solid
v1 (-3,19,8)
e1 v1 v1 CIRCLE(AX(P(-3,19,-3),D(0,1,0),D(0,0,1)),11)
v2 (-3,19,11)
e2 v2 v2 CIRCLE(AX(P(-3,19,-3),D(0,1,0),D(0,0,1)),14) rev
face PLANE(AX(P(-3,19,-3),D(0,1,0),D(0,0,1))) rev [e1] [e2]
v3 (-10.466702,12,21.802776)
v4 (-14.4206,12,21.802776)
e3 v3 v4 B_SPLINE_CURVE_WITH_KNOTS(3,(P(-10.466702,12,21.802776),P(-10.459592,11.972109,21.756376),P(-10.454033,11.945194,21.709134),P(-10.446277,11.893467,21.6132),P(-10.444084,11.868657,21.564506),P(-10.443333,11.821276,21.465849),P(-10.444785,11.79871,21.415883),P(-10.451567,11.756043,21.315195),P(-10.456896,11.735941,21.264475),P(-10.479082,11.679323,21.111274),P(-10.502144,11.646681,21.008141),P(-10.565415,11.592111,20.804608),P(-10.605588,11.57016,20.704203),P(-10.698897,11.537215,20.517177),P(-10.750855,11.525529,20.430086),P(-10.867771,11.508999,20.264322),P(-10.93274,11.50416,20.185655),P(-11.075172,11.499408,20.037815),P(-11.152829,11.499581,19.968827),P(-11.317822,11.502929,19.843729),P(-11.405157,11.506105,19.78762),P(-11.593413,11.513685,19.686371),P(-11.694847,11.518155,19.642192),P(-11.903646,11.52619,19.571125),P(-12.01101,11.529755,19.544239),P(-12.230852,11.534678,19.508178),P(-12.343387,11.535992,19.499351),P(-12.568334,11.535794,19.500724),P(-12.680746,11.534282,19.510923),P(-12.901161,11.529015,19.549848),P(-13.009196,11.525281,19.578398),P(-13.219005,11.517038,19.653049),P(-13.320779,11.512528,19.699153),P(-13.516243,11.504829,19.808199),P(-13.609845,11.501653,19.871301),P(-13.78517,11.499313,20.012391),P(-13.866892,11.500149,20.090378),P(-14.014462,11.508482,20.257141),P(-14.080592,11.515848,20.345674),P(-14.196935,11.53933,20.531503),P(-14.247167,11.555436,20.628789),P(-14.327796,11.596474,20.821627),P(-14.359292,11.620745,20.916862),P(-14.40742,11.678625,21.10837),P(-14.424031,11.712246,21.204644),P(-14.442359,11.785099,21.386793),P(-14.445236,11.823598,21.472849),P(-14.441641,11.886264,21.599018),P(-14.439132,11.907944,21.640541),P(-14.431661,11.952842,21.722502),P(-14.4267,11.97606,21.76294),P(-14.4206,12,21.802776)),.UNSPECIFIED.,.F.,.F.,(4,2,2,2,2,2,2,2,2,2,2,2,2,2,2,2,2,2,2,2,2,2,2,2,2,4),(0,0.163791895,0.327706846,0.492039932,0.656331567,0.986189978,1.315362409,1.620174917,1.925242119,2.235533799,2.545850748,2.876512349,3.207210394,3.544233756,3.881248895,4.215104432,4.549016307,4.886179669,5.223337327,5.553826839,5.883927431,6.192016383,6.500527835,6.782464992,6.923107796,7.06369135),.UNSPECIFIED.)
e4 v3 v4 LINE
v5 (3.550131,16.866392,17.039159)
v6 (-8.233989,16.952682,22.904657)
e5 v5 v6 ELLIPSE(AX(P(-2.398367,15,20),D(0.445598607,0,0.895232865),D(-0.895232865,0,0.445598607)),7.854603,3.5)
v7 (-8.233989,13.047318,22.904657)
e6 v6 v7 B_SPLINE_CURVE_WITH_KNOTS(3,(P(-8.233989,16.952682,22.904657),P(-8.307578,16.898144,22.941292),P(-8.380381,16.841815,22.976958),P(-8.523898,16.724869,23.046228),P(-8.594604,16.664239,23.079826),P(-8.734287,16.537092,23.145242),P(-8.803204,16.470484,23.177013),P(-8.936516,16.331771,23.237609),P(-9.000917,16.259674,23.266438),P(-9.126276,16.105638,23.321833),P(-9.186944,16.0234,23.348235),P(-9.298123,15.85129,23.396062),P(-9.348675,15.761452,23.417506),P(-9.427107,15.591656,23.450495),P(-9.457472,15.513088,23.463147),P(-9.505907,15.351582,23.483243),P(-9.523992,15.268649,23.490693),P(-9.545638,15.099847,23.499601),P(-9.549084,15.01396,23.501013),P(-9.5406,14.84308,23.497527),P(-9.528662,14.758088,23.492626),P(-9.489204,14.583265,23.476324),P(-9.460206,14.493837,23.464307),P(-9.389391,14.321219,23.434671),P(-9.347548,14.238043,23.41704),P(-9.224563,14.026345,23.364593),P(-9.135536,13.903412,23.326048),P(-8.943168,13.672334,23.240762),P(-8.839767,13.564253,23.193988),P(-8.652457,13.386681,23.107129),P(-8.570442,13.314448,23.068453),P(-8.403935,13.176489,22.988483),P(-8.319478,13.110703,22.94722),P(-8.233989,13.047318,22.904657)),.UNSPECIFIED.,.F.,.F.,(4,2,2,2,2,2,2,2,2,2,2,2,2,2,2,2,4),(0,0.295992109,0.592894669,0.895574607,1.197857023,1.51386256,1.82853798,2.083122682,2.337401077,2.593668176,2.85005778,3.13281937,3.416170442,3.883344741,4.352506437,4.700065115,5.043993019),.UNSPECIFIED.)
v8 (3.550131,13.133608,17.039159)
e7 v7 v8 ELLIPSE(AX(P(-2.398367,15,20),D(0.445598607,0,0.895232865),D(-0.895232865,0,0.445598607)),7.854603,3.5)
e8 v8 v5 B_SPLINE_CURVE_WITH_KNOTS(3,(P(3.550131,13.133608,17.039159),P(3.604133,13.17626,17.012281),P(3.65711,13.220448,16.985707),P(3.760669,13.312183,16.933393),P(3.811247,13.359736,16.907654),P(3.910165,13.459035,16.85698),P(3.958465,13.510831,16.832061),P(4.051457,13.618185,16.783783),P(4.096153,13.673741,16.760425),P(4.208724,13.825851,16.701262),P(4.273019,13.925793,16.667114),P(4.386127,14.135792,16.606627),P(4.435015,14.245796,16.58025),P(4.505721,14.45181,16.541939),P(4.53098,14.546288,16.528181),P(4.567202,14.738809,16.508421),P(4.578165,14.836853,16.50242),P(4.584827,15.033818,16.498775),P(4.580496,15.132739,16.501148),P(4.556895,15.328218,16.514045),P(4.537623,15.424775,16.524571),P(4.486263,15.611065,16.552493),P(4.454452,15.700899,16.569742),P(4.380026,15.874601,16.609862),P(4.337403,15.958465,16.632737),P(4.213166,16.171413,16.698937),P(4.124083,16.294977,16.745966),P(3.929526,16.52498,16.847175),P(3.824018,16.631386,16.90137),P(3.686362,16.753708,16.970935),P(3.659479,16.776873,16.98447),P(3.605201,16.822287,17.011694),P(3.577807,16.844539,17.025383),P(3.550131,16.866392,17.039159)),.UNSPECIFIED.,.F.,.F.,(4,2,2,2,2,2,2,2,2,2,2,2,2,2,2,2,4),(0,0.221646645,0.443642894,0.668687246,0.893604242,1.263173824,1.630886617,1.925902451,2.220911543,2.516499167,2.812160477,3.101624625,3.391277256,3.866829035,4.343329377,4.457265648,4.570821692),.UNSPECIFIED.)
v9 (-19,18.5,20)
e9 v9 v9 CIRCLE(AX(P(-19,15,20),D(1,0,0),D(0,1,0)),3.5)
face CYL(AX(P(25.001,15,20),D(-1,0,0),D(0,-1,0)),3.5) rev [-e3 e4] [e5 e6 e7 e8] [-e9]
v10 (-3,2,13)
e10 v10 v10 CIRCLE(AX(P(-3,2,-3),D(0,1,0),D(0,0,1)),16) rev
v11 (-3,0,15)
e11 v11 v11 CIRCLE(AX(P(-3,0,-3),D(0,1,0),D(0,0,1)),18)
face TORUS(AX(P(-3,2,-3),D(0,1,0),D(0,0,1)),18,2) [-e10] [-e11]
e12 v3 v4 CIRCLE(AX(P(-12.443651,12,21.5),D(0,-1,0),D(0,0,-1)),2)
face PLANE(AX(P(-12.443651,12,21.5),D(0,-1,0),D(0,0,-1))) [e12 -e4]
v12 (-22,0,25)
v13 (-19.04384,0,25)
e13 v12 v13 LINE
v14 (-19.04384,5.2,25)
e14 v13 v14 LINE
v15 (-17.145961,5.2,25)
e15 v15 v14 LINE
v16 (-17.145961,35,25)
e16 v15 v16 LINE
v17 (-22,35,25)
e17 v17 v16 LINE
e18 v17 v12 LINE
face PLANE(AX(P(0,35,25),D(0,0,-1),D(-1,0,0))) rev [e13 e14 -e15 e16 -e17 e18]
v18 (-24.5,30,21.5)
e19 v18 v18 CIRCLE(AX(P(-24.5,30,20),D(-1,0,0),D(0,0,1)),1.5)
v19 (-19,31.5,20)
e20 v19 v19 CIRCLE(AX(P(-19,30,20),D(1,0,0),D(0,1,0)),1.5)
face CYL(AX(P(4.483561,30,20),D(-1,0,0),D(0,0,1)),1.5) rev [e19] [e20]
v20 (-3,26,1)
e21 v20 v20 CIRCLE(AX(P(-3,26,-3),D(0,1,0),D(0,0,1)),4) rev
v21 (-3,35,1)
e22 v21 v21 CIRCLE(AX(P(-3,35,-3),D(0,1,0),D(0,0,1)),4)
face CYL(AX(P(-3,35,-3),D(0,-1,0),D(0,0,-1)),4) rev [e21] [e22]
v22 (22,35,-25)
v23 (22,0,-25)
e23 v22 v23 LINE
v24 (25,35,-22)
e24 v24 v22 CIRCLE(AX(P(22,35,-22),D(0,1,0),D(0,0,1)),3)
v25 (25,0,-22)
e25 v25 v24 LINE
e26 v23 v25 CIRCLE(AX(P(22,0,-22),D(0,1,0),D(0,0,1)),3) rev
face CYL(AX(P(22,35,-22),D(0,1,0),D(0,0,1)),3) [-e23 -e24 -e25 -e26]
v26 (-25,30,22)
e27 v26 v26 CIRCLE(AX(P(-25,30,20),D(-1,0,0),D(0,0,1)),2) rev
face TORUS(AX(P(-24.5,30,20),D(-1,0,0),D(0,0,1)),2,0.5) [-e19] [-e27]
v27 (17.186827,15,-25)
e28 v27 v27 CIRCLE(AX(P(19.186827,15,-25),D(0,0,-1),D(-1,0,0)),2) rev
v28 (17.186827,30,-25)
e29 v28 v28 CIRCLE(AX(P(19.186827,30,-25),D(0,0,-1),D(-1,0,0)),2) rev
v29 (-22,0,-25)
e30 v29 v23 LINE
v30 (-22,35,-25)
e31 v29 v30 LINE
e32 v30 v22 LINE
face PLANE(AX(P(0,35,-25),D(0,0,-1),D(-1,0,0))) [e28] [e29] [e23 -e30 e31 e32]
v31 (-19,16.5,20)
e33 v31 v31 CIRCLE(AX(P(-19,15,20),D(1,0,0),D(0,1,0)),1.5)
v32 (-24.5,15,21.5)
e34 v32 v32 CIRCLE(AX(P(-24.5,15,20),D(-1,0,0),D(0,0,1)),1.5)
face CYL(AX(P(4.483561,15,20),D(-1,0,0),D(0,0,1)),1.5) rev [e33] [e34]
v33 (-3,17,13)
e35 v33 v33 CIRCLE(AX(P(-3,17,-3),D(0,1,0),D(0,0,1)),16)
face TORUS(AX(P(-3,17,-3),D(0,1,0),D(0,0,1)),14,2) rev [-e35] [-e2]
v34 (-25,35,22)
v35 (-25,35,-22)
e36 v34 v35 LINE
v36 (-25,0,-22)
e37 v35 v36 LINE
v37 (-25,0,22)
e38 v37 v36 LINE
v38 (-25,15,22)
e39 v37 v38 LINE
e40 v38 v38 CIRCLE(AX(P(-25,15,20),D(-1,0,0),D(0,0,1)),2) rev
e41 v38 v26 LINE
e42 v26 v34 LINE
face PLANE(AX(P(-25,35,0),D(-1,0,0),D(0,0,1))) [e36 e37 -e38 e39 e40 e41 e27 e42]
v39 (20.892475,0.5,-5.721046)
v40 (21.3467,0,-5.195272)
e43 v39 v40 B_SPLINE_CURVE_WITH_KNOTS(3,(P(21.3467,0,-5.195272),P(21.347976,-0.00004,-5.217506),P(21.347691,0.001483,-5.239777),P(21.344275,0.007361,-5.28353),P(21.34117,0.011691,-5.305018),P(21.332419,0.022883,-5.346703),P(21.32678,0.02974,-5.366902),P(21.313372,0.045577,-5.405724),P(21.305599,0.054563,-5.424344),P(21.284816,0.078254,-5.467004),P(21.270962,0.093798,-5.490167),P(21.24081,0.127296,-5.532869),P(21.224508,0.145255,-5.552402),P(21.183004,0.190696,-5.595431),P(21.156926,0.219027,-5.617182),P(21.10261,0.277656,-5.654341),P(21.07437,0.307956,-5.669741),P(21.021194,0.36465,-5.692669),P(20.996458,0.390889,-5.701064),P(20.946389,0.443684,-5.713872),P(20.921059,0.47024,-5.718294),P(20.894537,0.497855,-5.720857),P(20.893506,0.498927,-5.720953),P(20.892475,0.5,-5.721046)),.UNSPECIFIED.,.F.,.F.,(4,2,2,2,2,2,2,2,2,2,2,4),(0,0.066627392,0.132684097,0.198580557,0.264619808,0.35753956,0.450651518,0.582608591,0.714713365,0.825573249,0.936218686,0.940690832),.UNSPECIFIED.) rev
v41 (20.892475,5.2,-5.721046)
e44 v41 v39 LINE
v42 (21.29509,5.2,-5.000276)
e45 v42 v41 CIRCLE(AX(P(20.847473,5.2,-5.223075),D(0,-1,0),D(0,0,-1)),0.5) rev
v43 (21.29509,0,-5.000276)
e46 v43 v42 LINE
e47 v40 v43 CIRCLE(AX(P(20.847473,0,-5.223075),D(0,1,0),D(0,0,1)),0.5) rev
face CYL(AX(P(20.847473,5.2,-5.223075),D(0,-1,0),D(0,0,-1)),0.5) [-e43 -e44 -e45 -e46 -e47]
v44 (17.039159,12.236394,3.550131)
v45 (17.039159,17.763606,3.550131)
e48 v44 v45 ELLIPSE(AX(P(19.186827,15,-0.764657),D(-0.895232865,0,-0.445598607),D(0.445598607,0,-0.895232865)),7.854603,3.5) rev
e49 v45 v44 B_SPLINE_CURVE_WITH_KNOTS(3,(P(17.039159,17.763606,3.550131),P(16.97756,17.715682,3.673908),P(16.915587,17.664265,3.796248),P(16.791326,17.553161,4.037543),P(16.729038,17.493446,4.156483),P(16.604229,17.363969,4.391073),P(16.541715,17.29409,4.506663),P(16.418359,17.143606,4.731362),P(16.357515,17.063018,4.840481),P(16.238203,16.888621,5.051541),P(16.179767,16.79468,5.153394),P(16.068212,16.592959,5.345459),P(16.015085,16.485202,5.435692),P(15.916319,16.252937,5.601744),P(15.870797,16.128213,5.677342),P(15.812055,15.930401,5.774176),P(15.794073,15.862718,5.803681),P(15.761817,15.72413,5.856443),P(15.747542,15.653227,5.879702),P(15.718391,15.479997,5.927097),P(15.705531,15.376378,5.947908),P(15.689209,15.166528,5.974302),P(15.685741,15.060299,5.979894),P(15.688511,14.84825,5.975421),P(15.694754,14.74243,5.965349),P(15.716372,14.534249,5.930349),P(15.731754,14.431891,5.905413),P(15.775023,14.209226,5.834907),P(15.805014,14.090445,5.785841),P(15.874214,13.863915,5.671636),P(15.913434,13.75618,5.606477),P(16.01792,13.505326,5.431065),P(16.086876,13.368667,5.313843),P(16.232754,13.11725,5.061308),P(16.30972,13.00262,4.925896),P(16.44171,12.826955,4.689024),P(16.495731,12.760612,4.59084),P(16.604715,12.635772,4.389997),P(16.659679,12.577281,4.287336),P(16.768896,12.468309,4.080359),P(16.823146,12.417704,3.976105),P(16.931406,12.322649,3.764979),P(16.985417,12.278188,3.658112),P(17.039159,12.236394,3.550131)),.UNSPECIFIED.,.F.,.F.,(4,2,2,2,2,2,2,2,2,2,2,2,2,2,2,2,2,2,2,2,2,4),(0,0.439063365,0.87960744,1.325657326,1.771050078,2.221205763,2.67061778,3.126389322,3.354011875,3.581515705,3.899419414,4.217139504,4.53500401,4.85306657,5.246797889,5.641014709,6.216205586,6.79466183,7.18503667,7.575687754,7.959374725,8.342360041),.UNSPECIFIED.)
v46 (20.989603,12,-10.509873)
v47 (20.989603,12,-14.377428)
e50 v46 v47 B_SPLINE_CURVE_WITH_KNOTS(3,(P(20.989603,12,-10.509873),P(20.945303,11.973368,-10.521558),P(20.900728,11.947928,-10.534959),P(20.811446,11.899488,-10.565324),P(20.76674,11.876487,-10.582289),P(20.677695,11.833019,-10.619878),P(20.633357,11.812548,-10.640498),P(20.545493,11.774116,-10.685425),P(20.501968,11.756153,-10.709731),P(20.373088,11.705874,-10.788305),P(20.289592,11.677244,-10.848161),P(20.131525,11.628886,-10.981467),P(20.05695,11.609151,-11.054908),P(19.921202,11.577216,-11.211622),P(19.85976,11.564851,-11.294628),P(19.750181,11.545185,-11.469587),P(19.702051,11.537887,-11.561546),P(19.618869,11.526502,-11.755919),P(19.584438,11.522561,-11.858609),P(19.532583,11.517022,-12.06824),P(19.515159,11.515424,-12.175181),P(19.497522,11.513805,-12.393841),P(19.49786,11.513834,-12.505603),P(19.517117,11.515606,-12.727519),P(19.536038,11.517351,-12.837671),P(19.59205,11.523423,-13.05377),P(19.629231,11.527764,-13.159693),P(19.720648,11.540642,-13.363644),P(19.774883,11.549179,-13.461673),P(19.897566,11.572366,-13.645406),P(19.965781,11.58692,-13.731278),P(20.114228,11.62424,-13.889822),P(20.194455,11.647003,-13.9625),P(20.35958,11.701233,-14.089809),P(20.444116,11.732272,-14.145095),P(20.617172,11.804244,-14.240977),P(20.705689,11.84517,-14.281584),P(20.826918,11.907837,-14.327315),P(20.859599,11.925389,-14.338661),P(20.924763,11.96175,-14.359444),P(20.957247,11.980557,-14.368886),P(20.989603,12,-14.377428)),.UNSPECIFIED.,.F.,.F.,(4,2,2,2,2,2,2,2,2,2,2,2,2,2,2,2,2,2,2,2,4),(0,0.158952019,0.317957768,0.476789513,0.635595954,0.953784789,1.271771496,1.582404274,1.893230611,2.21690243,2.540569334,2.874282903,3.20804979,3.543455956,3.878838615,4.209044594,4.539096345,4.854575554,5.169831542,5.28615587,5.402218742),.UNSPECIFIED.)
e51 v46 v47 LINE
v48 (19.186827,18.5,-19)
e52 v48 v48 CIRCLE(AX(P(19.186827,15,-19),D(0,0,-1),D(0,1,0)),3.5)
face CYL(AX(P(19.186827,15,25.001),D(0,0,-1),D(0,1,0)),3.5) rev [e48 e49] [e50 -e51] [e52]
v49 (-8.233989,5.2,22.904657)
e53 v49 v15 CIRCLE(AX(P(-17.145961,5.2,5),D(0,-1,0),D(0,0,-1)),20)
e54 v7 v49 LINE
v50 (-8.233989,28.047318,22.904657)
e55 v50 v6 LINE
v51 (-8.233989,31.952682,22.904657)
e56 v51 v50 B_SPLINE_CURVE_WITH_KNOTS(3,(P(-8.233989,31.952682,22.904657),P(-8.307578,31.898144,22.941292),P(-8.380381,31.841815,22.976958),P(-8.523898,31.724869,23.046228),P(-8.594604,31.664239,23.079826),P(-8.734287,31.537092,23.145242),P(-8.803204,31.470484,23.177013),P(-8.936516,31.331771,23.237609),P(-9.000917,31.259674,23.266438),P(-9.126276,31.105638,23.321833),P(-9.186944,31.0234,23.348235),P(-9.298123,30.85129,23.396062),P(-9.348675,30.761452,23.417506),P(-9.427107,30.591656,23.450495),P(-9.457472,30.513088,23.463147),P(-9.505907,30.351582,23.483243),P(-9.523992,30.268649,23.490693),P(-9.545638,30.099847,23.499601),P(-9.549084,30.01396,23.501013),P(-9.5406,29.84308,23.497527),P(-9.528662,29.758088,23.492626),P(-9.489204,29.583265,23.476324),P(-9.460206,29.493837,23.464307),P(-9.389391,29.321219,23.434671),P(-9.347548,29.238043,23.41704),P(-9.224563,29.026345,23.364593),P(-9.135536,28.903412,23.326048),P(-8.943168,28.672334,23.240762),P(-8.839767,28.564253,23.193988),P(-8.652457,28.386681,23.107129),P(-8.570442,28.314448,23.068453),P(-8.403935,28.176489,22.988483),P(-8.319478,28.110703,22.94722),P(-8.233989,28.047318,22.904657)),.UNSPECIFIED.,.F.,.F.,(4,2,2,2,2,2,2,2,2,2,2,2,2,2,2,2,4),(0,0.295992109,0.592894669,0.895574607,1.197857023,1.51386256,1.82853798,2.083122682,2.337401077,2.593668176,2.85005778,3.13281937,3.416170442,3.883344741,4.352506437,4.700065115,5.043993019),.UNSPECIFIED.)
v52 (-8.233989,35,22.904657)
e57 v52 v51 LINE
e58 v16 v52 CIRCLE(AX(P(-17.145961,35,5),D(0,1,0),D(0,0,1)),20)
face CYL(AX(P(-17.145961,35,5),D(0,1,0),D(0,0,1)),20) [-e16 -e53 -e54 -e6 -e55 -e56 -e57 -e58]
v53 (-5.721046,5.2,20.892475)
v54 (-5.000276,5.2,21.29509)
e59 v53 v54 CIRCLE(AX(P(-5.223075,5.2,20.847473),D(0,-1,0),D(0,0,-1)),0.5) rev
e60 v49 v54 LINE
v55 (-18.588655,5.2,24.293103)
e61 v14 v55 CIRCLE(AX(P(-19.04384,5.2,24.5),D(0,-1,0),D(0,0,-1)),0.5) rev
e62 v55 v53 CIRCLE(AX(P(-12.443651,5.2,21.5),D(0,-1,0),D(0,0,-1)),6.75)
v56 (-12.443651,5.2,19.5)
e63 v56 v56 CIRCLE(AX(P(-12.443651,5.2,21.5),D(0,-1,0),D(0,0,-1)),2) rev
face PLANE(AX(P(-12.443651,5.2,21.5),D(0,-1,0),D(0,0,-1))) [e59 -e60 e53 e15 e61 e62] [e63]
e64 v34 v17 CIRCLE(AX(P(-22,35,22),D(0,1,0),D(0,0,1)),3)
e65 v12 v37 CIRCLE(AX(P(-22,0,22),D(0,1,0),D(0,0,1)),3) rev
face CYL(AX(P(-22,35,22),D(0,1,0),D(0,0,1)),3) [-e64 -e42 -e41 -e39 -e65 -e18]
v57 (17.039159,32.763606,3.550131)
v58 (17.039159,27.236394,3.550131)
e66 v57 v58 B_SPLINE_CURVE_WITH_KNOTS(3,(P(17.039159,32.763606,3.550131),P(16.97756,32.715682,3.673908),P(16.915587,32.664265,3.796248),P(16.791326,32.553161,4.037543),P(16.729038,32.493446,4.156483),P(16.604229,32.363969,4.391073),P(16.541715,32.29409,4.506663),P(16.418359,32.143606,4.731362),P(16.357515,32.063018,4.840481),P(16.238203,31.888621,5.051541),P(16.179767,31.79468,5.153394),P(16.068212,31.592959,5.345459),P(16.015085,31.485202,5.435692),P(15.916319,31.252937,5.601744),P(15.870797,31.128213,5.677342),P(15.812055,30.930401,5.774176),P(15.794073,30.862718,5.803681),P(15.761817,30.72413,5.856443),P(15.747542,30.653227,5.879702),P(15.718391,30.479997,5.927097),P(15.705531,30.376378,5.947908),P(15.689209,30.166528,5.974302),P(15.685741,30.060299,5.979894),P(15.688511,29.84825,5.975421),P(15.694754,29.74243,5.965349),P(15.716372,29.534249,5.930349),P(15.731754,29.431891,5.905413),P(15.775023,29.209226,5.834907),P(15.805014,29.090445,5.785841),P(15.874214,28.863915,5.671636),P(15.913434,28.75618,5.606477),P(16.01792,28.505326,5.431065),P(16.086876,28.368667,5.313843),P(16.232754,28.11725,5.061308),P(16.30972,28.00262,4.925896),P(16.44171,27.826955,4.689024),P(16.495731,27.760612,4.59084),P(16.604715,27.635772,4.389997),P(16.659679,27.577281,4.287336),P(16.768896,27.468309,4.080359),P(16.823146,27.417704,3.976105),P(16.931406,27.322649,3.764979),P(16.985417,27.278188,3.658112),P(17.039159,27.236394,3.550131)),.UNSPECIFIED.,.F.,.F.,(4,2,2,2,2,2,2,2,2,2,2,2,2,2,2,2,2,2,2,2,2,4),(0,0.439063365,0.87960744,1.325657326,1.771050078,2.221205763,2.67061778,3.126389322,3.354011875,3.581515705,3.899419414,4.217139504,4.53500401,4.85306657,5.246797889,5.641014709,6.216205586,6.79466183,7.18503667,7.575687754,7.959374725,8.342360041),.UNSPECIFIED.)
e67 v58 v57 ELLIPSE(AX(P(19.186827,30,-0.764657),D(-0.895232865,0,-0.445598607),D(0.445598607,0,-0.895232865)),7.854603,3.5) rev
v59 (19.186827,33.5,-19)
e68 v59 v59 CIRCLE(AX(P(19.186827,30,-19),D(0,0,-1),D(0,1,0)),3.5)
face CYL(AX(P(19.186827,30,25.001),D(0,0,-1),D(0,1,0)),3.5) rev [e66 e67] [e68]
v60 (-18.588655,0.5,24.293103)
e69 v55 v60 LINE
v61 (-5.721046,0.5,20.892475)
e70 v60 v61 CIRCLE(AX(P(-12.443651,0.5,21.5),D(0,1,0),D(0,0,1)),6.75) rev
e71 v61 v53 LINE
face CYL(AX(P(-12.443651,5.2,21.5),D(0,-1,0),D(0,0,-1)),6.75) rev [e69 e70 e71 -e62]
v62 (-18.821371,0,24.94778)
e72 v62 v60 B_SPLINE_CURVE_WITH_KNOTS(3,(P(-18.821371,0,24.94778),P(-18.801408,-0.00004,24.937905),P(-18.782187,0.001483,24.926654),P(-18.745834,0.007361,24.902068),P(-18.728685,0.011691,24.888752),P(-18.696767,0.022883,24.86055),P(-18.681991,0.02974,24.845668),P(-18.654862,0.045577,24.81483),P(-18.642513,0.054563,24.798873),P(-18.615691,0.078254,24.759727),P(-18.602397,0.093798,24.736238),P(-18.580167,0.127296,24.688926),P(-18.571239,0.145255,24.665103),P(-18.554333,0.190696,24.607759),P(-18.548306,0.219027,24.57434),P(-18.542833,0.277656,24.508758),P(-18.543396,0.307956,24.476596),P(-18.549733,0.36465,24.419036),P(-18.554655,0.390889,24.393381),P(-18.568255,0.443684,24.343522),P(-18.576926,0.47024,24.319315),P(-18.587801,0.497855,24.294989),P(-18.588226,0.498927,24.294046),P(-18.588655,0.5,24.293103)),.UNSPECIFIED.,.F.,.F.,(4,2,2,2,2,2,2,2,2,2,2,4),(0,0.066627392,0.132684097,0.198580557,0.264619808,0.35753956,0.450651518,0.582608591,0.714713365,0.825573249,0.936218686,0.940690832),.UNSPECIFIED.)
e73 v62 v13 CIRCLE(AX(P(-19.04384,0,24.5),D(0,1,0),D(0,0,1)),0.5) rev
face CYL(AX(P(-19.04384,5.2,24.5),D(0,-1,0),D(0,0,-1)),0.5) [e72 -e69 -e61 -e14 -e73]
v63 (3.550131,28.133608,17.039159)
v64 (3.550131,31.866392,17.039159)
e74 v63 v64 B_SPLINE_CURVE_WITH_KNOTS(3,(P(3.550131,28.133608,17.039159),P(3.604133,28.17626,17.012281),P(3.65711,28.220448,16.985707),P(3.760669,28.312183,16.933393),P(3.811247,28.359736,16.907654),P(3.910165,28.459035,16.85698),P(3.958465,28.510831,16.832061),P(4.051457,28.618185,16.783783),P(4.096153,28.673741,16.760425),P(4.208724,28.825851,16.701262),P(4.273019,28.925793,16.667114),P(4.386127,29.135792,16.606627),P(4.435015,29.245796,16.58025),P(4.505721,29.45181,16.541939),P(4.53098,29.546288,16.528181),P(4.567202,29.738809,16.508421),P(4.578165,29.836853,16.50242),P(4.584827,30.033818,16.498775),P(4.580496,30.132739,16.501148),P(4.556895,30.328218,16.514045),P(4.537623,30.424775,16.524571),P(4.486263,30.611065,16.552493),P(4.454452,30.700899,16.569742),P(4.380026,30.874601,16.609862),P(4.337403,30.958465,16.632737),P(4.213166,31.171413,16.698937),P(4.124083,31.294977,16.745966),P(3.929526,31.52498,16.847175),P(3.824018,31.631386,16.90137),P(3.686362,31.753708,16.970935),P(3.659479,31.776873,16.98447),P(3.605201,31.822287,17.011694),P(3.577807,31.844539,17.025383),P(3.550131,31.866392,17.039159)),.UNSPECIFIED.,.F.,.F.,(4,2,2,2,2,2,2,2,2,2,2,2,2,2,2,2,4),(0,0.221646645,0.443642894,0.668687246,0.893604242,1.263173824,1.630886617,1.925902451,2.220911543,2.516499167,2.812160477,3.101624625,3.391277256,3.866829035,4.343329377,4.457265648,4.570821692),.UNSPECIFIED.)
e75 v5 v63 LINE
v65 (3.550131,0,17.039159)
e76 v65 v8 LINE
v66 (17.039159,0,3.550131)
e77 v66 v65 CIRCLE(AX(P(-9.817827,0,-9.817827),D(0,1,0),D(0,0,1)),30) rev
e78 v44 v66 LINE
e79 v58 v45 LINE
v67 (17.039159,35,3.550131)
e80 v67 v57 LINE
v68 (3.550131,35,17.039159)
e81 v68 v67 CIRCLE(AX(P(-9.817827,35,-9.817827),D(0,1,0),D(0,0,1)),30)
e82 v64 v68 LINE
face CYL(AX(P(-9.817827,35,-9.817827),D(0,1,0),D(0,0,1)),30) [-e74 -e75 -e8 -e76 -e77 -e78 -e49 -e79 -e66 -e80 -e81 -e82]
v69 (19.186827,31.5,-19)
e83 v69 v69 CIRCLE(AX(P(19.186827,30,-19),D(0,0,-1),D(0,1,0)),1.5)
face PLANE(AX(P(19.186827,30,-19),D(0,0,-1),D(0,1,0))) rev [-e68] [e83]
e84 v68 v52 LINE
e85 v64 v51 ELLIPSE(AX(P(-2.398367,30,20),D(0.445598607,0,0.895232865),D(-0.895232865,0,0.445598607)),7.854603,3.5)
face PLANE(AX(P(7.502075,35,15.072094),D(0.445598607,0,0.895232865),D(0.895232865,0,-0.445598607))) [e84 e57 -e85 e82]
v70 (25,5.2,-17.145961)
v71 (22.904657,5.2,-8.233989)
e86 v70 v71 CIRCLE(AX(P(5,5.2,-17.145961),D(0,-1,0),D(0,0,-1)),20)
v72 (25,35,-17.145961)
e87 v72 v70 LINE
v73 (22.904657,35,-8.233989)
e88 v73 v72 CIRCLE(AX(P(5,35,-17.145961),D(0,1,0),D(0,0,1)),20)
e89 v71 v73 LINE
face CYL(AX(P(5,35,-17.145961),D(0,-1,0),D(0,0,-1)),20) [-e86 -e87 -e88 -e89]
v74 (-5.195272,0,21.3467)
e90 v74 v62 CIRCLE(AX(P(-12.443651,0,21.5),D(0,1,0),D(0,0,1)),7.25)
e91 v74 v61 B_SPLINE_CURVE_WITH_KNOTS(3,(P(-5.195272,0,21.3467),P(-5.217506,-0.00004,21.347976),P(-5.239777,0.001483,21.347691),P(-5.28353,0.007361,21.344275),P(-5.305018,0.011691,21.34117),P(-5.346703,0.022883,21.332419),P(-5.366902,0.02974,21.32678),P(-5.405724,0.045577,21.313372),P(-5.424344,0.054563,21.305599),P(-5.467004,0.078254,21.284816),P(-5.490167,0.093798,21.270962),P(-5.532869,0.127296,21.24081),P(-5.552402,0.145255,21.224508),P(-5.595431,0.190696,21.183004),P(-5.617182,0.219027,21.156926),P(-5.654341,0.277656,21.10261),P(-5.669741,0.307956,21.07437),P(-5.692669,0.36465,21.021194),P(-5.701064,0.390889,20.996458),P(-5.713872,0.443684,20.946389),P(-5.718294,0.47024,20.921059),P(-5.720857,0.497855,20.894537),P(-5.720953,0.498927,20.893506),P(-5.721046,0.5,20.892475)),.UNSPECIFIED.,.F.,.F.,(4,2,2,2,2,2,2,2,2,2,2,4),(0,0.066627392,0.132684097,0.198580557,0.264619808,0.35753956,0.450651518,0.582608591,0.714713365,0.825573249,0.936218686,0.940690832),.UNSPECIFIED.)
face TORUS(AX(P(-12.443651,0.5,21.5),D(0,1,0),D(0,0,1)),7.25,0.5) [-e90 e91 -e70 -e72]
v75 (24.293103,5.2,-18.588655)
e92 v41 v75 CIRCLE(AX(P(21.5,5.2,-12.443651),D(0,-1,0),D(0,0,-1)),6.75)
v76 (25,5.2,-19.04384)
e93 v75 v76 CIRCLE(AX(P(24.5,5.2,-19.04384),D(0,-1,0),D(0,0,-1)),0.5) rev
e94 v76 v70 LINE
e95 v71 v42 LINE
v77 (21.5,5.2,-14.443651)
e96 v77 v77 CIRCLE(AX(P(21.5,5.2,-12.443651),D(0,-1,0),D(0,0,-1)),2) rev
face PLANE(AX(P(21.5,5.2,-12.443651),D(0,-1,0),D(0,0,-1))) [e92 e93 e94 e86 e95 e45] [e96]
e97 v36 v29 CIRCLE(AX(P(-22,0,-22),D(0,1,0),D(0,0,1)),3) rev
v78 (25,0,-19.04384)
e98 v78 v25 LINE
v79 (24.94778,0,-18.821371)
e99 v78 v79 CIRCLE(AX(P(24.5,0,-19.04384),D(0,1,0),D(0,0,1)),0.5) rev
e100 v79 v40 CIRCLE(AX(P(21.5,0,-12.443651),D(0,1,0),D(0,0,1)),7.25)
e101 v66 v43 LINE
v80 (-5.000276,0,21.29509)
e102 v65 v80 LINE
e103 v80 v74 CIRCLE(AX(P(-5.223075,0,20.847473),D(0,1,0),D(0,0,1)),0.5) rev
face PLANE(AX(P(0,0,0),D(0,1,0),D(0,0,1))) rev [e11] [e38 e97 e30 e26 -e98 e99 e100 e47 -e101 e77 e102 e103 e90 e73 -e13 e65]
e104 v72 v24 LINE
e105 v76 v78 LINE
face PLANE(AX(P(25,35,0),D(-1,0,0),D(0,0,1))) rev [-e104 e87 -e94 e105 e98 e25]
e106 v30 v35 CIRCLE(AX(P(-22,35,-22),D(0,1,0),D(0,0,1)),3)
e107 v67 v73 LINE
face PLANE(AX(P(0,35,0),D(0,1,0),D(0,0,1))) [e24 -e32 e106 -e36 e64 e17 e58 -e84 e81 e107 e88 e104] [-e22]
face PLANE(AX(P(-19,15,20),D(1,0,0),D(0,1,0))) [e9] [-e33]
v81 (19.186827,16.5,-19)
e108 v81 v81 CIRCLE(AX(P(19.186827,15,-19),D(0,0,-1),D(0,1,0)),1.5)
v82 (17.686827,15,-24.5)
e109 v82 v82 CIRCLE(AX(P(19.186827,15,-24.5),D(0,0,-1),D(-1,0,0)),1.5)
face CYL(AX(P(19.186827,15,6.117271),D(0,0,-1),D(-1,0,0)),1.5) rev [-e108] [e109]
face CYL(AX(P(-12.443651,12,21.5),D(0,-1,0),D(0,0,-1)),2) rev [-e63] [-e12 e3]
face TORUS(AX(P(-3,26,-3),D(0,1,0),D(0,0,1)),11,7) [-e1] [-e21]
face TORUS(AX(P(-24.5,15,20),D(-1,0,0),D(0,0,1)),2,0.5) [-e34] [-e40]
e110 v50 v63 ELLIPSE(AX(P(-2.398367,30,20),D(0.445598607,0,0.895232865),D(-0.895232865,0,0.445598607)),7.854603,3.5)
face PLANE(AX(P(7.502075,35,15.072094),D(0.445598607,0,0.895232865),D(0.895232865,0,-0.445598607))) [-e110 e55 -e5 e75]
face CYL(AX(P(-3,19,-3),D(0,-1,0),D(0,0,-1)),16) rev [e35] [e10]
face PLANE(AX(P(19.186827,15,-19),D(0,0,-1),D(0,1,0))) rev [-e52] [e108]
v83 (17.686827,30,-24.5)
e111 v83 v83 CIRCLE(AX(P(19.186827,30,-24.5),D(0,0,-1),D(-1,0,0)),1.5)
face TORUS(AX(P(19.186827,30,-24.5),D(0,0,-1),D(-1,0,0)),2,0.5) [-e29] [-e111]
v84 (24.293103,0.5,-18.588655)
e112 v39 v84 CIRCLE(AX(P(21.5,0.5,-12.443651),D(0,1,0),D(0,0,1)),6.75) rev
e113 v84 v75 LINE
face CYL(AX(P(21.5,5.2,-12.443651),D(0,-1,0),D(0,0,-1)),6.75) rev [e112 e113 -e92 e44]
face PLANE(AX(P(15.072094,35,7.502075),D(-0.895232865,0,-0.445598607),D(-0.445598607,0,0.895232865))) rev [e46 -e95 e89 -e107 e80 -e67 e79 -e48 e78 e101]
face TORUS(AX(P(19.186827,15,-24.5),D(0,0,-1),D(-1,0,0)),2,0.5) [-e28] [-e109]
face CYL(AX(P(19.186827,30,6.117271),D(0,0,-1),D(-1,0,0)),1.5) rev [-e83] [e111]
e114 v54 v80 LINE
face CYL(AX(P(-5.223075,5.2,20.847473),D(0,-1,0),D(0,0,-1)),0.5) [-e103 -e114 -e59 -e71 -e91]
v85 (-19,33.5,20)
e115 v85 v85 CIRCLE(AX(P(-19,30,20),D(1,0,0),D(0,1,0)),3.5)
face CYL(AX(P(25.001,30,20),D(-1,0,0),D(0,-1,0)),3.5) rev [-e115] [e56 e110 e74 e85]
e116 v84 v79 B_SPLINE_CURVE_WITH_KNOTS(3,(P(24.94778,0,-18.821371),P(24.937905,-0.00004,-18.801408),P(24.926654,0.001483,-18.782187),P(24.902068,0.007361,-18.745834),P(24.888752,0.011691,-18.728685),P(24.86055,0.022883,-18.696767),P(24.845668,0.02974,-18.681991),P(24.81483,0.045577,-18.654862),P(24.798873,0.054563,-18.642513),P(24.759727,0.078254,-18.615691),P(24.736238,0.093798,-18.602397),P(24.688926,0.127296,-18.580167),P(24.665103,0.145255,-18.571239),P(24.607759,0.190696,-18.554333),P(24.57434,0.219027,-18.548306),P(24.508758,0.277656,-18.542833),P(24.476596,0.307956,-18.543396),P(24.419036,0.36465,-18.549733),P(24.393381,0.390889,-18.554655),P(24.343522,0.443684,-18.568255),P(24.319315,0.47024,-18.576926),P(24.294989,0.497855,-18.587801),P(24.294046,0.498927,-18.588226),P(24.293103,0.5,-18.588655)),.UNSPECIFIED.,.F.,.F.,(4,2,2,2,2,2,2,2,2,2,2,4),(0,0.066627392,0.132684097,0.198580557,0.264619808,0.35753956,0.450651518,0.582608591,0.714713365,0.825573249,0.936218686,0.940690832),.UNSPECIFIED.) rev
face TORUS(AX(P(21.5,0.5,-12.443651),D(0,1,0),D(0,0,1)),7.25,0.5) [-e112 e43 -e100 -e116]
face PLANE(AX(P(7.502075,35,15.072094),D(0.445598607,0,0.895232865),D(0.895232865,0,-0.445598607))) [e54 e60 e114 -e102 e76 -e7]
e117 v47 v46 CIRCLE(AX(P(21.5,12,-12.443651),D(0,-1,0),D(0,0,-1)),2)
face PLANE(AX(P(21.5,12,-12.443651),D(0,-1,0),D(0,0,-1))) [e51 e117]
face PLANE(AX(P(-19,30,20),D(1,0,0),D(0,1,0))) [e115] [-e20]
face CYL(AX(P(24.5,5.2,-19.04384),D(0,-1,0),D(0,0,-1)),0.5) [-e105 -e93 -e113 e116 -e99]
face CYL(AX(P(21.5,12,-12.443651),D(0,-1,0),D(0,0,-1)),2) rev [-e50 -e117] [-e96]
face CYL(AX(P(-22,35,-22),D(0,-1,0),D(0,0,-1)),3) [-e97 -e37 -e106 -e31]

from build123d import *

# Parameters (mm, degrees)
ESQUISSE1_R             = 4
BOSS_EXTRU_1_DEPTH      = 35
ESQUISSE16_R            = 2
ENL_V_MAT_EXTRU_8_DEPTH = 12
ESQUISSE2_R             = 16
ENL_V_MAT_EXTRU_1_DEPTH = 19
ENL_V_MAT_EXTRU_2_REACH = 67.955
ESQUISSE4_R             = 1.5
ENL_V_MAT_EXTRU_3_REACH = 67.955
ESQUISSE5_R             = 1.5
ESQUISSE15_R            = 6.75
ENL_V_MAT_EXTRU_7_DEPTH = 5.2
ENL_V_MAT_EXTRU_5_REACH = 63.53
ESQUISSE11_R            = 3.5
ENL_V_MAT_EXTRU_6_REACH = 63.53
ESQUISSE14_R            = 3.5
CONG_1_2MM_R            = 2
CONG_2_7MM_R            = 7
CONG_4_30MM_R           = 30
CONG_5_20MM_R           = 20
CONG_6_3MM_R            = 3
CONG_8_0_5MM_R          = 0.5


# Some blends are built 0.0001 mm under size
with BuildPart() as part:
    # Esquisse1 → Boss.-Extru.1 (new body)
    with BuildSketch(Plane(origin=(0, 0, 0), x_dir=(1, 0, 0), z_dir=(0, 1, 0))):
        Polygon((-25, 25), (-25, -25), (-12.443650814, -25), (12.556349186, -12.556349186), (25, 12.443650814), (25, 25), align=None)
        with Locations(Location((-3, 3, 0), (0, 0, 270))):
            Circle(ESQUISSE1_R, mode=Mode.SUBTRACT)
    extrude(amount=BOSS_EXTRU_1_DEPTH)

    # Esquisse16 → Enlèv. mat.-Extru.8 (cut)
    with BuildSketch(Plane.XZ):
        with Locations(Location((-12.443650814, 21.5, 0), (0, 0, 270))):
            Circle(ESQUISSE16_R)
        with Locations(Location((21.5, -12.443650814, 0), (0, 0, 270))):
            Circle(ESQUISSE16_R)
    extrude(amount=-ENL_V_MAT_EXTRU_8_DEPTH, mode=Mode.SUBTRACT)

    # Esquisse2 → Enlèv. mat.-Extru.1 (cut)
    with BuildSketch(Plane(origin=(0, 0, 0), x_dir=(1, 0, 0), z_dir=(0, 1, 0))):
        with Locations(Location((-3, 3, 0), (0, 0, 270))):
            Circle(ESQUISSE2_R)
    extrude(amount=ENL_V_MAT_EXTRU_1_DEPTH, mode=Mode.SUBTRACT)

    # Enlèv. mat.-Extru.2: up to this plane
    enl_v_mat_extru_2_end = Plane(origin=(7.502075036, 35, 15.072094092), z_dir=(0.44559860656034184, 0, 0.8952328645841158))
    # Esquisse4 → Enlèv. mat.-Extru.2 (cut, up to the surface)
    with BuildSketch(Plane.ZY.offset(25), mode=Mode.PRIVATE) as enl_v_mat_extru_2_sk1:
        with Locations((20, 30)):
            Circle(ESQUISSE4_R)
    enl_v_mat_extru_2_tool1 = split(extrude(enl_v_mat_extru_2_sk1.sketch, amount=-ENL_V_MAT_EXTRU_2_REACH, mode=Mode.PRIVATE), bisect_by=enl_v_mat_extru_2_end, keep=Keep.BOTH, mode=Mode.PRIVATE)
    add(enl_v_mat_extru_2_tool1.solids().sort_by_distance((-25, 30, 20))[0], mode=Mode.SUBTRACT)
    # Esquisse4 → Enlèv. mat.-Extru.2 (cut, up to the surface)
    with BuildSketch(Plane.ZY.offset(25), mode=Mode.PRIVATE) as enl_v_mat_extru_2_sk2:
        with Locations((20, 15)):
            Circle(ESQUISSE4_R)
    enl_v_mat_extru_2_tool2 = split(extrude(enl_v_mat_extru_2_sk2.sketch, amount=-ENL_V_MAT_EXTRU_2_REACH, mode=Mode.PRIVATE), bisect_by=enl_v_mat_extru_2_end, keep=Keep.BOTH, mode=Mode.PRIVATE)
    add(enl_v_mat_extru_2_tool2.solids().sort_by_distance((-25, 15, 20))[0], mode=Mode.SUBTRACT)

    # Enlèv. mat.-Extru.3: up to this plane
    enl_v_mat_extru_3_end = Plane(origin=(15.072094092, 35, 7.502075036), z_dir=(-0.8952328645841159, 0, -0.4455986065603416))
    # Esquisse5 → Enlèv. mat.-Extru.3 (cut, up to the surface)
    with BuildSketch(Plane(origin=(0, 0, -25), x_dir=(-1, 0, 0), z_dir=(0, 0, -1)), mode=Mode.PRIVATE) as enl_v_mat_extru_3_sk1:
        with Locations((-19.186827359, 30)):
            Circle(ESQUISSE5_R)
    enl_v_mat_extru_3_tool1 = split(extrude(enl_v_mat_extru_3_sk1.sketch, amount=-ENL_V_MAT_EXTRU_3_REACH, mode=Mode.PRIVATE), bisect_by=enl_v_mat_extru_3_end, keep=Keep.BOTH, mode=Mode.PRIVATE)
    add(enl_v_mat_extru_3_tool1.solids().sort_by_distance((19.186827, 30, -25))[0], mode=Mode.SUBTRACT)
    # Esquisse5 → Enlèv. mat.-Extru.3 (cut, up to the surface)
    with BuildSketch(Plane(origin=(0, 0, -25), x_dir=(-1, 0, 0), z_dir=(0, 0, -1)), mode=Mode.PRIVATE) as enl_v_mat_extru_3_sk2:
        with Locations((-19.186827359, 15)):
            Circle(ESQUISSE5_R)
    enl_v_mat_extru_3_tool2 = split(extrude(enl_v_mat_extru_3_sk2.sketch, amount=-ENL_V_MAT_EXTRU_3_REACH, mode=Mode.PRIVATE), bisect_by=enl_v_mat_extru_3_end, keep=Keep.BOTH, mode=Mode.PRIVATE)
    add(enl_v_mat_extru_3_tool2.solids().sort_by_distance((19.186827, 15, -25))[0], mode=Mode.SUBTRACT)

    # Esquisse15 → Enlèv. mat.-Extru.7 (cut)
    with BuildSketch(Plane.XZ):
        with Locations((-12.443650814, 21.5)):
            Circle(ESQUISSE15_R)
        with Locations((21.5, -12.443650814)):
            Circle(ESQUISSE15_R)
    extrude(amount=-ENL_V_MAT_EXTRU_7_DEPTH, mode=Mode.SUBTRACT)

    # Enlèv. mat.-Extru.5: up to this plane
    enl_v_mat_extru_5_end = Plane(origin=(7.502075036, 35, 15.072094092), z_dir=(0.44559860656034184, 0, 0.8952328645841158))
    # Esquisse11 → Enlèv. mat.-Extru.5 (cut, up to the surface)
    with BuildSketch(Plane(origin=(-19, 0, 0), x_dir=(0, 0, -1), z_dir=(1, 0, 0)), mode=Mode.PRIVATE) as enl_v_mat_extru_5_sk1:
        with Locations(Location((-20, 30, 0), (0, 0, 180))):
            Circle(ESQUISSE11_R)
    enl_v_mat_extru_5_tool1 = split(extrude(enl_v_mat_extru_5_sk1.sketch, amount=ENL_V_MAT_EXTRU_5_REACH, mode=Mode.PRIVATE), bisect_by=enl_v_mat_extru_5_end, keep=Keep.BOTH, mode=Mode.PRIVATE)
    add(enl_v_mat_extru_5_tool1.solids().sort_by_distance((-19, 30, 20))[0], mode=Mode.SUBTRACT)
    # Esquisse11 → Enlèv. mat.-Extru.5 (cut, up to the surface)
    with BuildSketch(Plane(origin=(-19, 0, 0), x_dir=(0, 0, -1), z_dir=(1, 0, 0)), mode=Mode.PRIVATE) as enl_v_mat_extru_5_sk2:
        with Locations(Location((-20, 15, 0), (0, 0, 180))):
            Circle(ESQUISSE11_R)
    enl_v_mat_extru_5_tool2 = split(extrude(enl_v_mat_extru_5_sk2.sketch, amount=ENL_V_MAT_EXTRU_5_REACH, mode=Mode.PRIVATE), bisect_by=enl_v_mat_extru_5_end, keep=Keep.BOTH, mode=Mode.PRIVATE)
    add(enl_v_mat_extru_5_tool2.solids().sort_by_distance((-19, 15, 20))[0], mode=Mode.SUBTRACT)

    # Enlèv. mat.-Extru.6: up to this plane
    enl_v_mat_extru_6_end = Plane(origin=(15.072094092, 35, 7.502075036), z_dir=(-0.8952328645841159, 0, -0.4455986065603416))
    # Esquisse14 → Enlèv. mat.-Extru.6 (cut, up to the surface)
    with BuildSketch(Plane(origin=(0, 0, -19), x_dir=(-1, 0, 0), z_dir=(0, 0, -1)), mode=Mode.PRIVATE) as enl_v_mat_extru_6_sk1:
        with Locations(Location((-19.186827359, 30, 0), (0, 0, 90))):
            Circle(ESQUISSE14_R)
    enl_v_mat_extru_6_tool1 = split(extrude(enl_v_mat_extru_6_sk1.sketch, amount=-ENL_V_MAT_EXTRU_6_REACH, mode=Mode.PRIVATE), bisect_by=enl_v_mat_extru_6_end, keep=Keep.BOTH, mode=Mode.PRIVATE)
    add(enl_v_mat_extru_6_tool1.solids().sort_by_distance((19.186827, 30, -19))[0], mode=Mode.SUBTRACT)
    # Esquisse14 → Enlèv. mat.-Extru.6 (cut, up to the surface)
    with BuildSketch(Plane(origin=(0, 0, -19), x_dir=(-1, 0, 0), z_dir=(0, 0, -1)), mode=Mode.PRIVATE) as enl_v_mat_extru_6_sk2:
        with Locations(Location((-19.186827359, 15, 0), (0, 0, 90))):
            Circle(ESQUISSE14_R)
    enl_v_mat_extru_6_tool2 = split(extrude(enl_v_mat_extru_6_sk2.sketch, amount=-ENL_V_MAT_EXTRU_6_REACH, mode=Mode.PRIVATE), bisect_by=enl_v_mat_extru_6_end, keep=Keep.BOTH, mode=Mode.PRIVATE)
    add(enl_v_mat_extru_6_tool2.solids().sort_by_distance((19.186827, 15, -19))[0], mode=Mode.SUBTRACT)

    # Congé 1 2mm
    cong_1_2mm_edges = [part.edges().sort_by_distance(p)[0] for p in [
        (-3, 0, -19),
        (-3, 19, -19),
    ]]
    fillet(cong_1_2mm_edges, radius=CONG_1_2MM_R)

    # Congé 2 7mm
    cong_2_7mm_edges = [part.edges().sort_by_distance(p)[0] for p in [
        (-3, 19, -7),
    ]]
    fillet(cong_2_7mm_edges, radius=CONG_2_7MM_R)

    # Congé 4 30mm
    # the kernel refuses this fillet: 30 mm, written as the material it takes off along each edge
    with BuildSketch(Plane(origin=(12.556349186, -25.15049063, 12.556349186), x_dir=(-0.895232864584116, 0, 0.4455986065603412), z_dir=(0, 1, 0))) as cong_4_30mm_piece_1:
        with BuildLine():
            CenterArc((CONG_4_30MM_R * 0.33533987507, -CONG_4_30MM_R), CONG_4_30MM_R, 90, 37.076712398)
            Line((-CONG_4_30MM_R * 0.267543888593, -CONG_4_30MM_R * 0.202170965989), (0, 0))
            Line((0, 0), (CONG_4_30MM_R * 0.33533987507, 0))
        make_face()
    extrude(amount=85.300981261, mode=Mode.SUBTRACT)

    # Congé 5 20mm
    # the kernel refuses this fillet: 20 mm, written as the material it takes off along each edge
    with BuildSketch(Plane(origin=(-12.443650814, -6.555774578, 25), x_dir=(0.8952328645841151, 0, -0.445598606560343), z_dir=(0, 1, 0)), Plane(origin=(25, -6.555774578, -12.443650814), x_dir=(0, 0, -1), z_dir=(0, 1, 0))) as cong_5_20mm_piece_1:
        with BuildLine():
            CenterArc((CONG_5_20MM_R * 0.235115491551, CONG_5_20MM_R), CONG_5_20MM_R, 243.538356199, 26.461643801)
            Line((-CONG_5_20MM_R * 0.210483115009, CONG_5_20MM_R * 0.104767135416), (0, 0))
            Line((0, 0), (CONG_5_20MM_R * 0.235115491551, 0))
        make_face()
    extrude(amount=53.311549155, mode=Mode.SUBTRACT)

    # Congé 6 3mm
    cong_6_3mm_edges = [part.edges().sort_by_distance(p)[0] for p in [
        (-25, 17.5, 25),
        (-25, 17.5, -25),
        (25, 17.5, -25),
    ]]
    fillet(cong_6_3mm_edges, radius=CONG_6_3MM_R)

    # Congé 8 0.5mm
    cong_8_0_5mm_edges = [part.edges().sort_by_distance(p)[0] for p in [
        (-25, 30, 18.5),
        (-25, 15, 18.5),
        (20.686827359, 30, -25),
        (20.686827359, 15, -25),
        (-5.69512253, 2.6, 21.640946821),
        (-14.192753104, 0, 14.980556682),
        (-18.215349004, 2.6, 25),
        (21.640946821, 2.6, -5.69512253),
        (25, 2.6, -18.215349004),
        (14.980556682, 0, -14.192753104),
    ]]
    fillet(cong_8_0_5mm_edges, radius=CONG_8_0_5MM_R - 0.0001)  # a hair under: the kernel refuses the full size


solid = part.part
